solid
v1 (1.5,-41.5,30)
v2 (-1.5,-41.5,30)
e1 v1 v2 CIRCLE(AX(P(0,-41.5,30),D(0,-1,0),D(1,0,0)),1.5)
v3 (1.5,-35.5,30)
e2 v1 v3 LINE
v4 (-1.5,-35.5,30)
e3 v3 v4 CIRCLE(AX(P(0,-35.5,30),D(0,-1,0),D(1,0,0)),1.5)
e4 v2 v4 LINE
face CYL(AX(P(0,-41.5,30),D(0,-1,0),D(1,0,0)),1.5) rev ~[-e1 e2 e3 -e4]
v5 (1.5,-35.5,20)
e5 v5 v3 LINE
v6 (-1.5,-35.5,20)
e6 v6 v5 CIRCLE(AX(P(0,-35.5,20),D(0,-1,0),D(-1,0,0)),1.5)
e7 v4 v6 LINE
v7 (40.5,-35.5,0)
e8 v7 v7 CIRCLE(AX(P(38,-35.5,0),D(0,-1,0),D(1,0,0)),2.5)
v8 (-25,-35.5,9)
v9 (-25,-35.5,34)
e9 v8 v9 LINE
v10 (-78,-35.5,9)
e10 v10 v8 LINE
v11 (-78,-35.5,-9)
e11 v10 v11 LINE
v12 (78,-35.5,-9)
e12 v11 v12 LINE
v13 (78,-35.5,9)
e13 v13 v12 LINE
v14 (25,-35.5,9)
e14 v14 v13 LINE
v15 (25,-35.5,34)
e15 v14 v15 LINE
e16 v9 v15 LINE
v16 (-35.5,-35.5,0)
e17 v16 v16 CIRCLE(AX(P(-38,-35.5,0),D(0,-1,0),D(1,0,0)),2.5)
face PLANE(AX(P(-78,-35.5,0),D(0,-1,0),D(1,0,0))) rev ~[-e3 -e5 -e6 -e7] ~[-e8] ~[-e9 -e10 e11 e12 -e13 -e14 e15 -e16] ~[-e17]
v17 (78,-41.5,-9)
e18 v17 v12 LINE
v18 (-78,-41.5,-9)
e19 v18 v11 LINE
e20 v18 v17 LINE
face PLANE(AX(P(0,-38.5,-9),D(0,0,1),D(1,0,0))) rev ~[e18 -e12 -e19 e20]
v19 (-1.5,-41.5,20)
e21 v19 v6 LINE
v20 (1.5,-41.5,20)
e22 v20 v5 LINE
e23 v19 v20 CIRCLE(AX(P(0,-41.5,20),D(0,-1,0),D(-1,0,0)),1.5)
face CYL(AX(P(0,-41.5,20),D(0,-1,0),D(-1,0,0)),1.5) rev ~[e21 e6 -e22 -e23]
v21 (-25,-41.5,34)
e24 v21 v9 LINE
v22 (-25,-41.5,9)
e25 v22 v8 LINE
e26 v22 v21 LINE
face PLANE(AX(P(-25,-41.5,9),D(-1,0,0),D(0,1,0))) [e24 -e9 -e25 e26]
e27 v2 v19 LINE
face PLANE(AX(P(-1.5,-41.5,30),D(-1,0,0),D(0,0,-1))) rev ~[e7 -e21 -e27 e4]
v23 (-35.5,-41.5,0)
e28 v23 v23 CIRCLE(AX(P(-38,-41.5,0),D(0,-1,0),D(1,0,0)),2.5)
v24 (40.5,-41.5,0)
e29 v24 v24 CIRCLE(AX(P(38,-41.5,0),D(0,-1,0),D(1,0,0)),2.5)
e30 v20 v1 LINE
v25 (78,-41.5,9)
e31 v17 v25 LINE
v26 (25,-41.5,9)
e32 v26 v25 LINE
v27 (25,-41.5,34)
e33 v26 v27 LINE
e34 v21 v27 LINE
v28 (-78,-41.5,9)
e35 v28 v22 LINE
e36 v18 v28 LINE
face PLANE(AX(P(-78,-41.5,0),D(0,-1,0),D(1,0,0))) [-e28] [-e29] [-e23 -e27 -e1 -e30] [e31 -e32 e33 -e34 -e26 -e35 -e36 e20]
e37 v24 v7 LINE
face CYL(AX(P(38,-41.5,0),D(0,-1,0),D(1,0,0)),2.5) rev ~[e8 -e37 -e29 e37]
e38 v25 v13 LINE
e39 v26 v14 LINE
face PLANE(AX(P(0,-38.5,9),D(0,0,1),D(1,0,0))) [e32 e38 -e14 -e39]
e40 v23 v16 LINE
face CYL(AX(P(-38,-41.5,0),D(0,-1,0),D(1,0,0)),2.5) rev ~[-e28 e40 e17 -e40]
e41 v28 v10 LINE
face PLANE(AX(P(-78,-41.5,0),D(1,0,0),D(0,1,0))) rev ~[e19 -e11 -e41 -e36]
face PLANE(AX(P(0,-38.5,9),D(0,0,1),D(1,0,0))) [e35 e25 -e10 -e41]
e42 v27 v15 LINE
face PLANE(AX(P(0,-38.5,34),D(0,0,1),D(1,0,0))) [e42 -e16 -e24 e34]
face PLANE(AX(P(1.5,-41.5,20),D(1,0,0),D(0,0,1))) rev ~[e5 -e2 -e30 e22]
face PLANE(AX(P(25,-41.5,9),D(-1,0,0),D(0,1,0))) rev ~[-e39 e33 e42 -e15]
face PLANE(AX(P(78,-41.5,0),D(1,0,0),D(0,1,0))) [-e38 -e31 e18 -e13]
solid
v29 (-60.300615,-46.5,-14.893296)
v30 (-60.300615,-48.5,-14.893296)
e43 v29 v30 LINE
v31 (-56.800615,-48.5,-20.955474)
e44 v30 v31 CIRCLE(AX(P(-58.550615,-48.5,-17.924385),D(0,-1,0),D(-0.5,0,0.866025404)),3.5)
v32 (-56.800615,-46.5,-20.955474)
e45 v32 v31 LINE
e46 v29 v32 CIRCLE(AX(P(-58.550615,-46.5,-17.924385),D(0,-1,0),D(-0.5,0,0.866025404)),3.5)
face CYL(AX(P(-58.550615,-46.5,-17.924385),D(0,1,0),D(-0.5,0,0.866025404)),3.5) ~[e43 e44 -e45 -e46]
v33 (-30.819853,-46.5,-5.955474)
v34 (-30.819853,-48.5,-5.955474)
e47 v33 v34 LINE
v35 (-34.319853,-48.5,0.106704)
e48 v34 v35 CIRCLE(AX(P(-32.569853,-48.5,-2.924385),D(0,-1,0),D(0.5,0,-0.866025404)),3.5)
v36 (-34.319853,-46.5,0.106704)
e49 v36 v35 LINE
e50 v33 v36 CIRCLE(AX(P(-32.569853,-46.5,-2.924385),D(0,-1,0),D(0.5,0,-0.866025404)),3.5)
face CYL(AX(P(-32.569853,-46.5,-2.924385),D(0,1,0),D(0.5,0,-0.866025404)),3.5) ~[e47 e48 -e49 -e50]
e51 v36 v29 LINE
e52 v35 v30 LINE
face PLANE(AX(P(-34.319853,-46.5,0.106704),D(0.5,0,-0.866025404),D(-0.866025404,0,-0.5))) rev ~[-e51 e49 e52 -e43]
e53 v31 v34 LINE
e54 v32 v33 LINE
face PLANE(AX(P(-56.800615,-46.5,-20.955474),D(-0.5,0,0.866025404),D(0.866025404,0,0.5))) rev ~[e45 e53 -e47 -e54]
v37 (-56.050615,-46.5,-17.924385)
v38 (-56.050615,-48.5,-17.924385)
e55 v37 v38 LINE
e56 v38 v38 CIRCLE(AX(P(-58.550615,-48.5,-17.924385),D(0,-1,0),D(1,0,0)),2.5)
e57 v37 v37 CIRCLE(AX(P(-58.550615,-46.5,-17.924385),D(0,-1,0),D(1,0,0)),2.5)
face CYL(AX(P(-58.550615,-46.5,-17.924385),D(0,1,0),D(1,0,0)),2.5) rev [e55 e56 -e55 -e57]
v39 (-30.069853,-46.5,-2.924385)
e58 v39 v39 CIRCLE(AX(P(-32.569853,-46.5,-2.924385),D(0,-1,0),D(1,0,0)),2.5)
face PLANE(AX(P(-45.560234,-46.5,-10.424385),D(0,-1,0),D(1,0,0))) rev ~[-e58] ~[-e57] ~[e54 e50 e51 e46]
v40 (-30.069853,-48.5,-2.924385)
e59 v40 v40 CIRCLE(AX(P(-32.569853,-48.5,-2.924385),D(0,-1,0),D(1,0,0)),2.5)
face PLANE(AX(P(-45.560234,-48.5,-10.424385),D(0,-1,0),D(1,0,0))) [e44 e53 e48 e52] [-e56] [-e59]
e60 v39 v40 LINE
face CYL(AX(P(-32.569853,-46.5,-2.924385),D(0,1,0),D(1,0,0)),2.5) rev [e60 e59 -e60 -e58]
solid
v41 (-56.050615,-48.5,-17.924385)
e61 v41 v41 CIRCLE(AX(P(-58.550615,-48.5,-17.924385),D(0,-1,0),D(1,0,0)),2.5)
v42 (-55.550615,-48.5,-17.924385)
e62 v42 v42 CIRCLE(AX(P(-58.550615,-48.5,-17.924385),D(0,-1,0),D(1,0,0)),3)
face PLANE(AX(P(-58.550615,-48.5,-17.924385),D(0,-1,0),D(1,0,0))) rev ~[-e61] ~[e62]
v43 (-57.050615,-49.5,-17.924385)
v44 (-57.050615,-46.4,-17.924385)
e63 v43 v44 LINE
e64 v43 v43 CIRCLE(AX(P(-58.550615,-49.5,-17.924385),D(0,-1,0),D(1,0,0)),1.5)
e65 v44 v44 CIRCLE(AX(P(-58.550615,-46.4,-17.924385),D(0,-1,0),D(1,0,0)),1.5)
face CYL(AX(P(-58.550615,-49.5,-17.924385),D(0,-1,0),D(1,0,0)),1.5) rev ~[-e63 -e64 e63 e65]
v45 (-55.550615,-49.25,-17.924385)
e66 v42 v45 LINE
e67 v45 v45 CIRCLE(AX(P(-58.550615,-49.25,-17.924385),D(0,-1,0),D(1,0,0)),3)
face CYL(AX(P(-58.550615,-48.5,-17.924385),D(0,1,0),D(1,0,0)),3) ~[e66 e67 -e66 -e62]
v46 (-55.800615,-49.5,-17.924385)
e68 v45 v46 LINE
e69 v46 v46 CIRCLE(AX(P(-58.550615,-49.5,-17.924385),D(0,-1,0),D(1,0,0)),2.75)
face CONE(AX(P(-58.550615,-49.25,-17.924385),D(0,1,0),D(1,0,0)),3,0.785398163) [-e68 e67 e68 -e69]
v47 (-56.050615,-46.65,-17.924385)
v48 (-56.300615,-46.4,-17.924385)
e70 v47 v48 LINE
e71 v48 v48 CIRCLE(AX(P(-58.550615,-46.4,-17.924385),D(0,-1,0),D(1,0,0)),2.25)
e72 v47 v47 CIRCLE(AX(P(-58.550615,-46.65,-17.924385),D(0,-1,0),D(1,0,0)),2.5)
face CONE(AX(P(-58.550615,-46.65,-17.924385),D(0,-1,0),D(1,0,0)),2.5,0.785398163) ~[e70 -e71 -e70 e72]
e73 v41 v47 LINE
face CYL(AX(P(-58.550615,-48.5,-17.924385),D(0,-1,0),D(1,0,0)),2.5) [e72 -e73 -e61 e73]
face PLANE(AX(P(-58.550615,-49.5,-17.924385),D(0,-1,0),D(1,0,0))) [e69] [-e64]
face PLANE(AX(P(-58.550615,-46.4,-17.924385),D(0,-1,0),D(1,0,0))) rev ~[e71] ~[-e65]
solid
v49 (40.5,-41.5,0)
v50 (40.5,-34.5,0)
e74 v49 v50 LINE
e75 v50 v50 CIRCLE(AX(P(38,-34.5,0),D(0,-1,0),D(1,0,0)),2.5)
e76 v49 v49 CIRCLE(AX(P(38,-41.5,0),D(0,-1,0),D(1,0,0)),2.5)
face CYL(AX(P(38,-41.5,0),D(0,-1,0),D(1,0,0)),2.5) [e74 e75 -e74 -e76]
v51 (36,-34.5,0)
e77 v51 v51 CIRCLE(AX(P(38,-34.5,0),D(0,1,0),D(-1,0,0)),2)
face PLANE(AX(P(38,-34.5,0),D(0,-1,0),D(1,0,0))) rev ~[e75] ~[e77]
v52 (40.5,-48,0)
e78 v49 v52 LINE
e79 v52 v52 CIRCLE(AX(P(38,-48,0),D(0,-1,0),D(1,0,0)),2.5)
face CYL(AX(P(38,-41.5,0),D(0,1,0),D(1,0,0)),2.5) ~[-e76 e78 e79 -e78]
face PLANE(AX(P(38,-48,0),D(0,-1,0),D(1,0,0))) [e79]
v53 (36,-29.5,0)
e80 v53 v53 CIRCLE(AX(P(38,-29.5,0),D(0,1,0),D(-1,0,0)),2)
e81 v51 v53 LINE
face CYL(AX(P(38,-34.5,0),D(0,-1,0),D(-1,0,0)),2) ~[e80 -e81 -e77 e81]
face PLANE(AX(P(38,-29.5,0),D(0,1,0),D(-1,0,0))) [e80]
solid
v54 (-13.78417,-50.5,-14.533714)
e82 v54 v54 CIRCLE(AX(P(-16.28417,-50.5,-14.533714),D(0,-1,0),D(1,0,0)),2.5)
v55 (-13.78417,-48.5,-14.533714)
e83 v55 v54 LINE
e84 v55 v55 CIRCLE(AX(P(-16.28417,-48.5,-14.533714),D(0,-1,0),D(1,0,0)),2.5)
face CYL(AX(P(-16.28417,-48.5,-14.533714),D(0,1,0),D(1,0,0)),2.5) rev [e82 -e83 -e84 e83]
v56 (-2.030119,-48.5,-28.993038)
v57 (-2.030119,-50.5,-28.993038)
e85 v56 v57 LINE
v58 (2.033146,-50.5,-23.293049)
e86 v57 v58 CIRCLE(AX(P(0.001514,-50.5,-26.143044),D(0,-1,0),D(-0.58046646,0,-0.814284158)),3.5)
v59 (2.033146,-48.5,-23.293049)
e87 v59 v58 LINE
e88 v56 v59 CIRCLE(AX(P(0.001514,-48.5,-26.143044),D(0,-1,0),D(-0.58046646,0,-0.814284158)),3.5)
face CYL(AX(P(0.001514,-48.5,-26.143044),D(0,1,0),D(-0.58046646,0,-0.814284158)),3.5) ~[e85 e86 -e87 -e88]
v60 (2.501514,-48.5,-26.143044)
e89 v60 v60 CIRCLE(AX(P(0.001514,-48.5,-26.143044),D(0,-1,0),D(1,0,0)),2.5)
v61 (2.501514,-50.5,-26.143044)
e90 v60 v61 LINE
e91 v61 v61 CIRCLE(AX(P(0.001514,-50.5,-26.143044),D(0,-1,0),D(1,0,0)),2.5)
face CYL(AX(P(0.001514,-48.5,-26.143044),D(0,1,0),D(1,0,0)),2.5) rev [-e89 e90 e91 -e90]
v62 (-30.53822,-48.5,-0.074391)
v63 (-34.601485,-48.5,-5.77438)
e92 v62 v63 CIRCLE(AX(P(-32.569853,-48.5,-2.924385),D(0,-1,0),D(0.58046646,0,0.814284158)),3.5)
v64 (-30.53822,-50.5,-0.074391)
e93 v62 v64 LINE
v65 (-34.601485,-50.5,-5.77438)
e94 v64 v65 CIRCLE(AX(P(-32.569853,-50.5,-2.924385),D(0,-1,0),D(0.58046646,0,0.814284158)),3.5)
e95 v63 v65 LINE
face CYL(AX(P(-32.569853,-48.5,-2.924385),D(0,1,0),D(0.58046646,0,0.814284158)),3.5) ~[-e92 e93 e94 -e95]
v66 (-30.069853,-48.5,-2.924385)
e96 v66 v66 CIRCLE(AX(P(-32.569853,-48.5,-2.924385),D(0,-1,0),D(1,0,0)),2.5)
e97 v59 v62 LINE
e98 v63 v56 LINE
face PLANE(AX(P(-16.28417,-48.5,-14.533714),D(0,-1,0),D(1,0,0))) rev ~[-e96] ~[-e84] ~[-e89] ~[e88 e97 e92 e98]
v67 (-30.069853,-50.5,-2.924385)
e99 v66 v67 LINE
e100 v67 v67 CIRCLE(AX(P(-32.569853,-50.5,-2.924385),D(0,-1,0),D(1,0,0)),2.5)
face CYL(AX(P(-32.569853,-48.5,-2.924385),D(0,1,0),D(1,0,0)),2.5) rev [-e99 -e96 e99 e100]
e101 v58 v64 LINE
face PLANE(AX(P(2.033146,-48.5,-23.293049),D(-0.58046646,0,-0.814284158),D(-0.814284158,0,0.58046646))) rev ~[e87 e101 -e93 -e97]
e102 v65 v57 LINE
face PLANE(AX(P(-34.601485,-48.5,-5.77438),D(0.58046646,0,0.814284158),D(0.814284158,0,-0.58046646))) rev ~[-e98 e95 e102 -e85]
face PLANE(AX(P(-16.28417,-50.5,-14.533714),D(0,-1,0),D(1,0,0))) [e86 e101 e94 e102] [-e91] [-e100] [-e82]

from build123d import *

# Parameters (mm, degrees)
F0_W      = 156
F0_H      = 6
F1_DEPTH  = 9
F2_R      = 2.5
F3_DEPTH  = 6
F5_R      = 2.5
F6_DEPTH  = 7
F7_R      = 2
F8_DEPTH  = 5
F9_R      = 2.5
F10_DEPTH = 6.5
F11_W     = 50
F11_H     = 6
F12_DEPTH = 25
F14_DEPTH = 6
F15_R     = 2.5
F16_DEPTH = 2
F17_R     = 2.5
F18_DEPTH = 2
F20_R     = 2.5
F21_DEPTH = 2.1
F22_R     = 3
F23_DEPTH = 1
F24_R     = 1.5
F25_DEPTH = 3.1
F26_SIZE  = 0.25


with BuildPart() as f1:
    # F0 (on Top) → F1 (new body, symmetric)
    with BuildSketch(Plane.XY):
        with Locations((0, -38.5)):
            Rectangle(F0_W, F0_H)
    extrude(amount=F1_DEPTH, both=True)

    # F2 (on face) → F3 (cut, through all)
    with BuildSketch(Plane.XZ.offset(41.5)):
        with Locations((-38, 0)):
            Circle(F2_R)
        with Locations((38, 0)):
            Circle(F2_R)
    extrude(amount=-F3_DEPTH, mode=Mode.SUBTRACT)

    # F11 (on face) → F12 (join)
    with BuildSketch(Plane.XY.offset(9)):
        with Locations((0, -38.5)):
            Rectangle(F11_W, F11_H)
    extrude(amount=F12_DEPTH)

    # F13 (on face) → F14 (cut, through all)
    with BuildSketch(Plane.XZ.offset(41.5)):
        with BuildLine():
            ThreePointArc((1.5, 30), (0, 31.5), (-1.5, 30))
            Line((-1.5, 30), (-1.5, 20))
            ThreePointArc((-1.5, 20), (0, 18.5), (1.5, 20))
            Line((1.5, 20), (1.5, 30))
        make_face()
    extrude(amount=-F14_DEPTH, mode=Mode.SUBTRACT)


with BuildPart() as f6:
    # F5 (on face) → F6 (new body)
    with BuildSketch(Plane.XZ.offset(41.5)):
        with Locations((38, 0)):
            Circle(F5_R)
    extrude(amount=-F6_DEPTH)

    # F7 (on face) → F8 (join)
    with BuildSketch(Plane(origin=(0, -34.5, 0), x_dir=(-1, 0, 0), z_dir=(0, 1, 0))):
        with Locations((-38, 0)):
            Circle(F7_R)
    extrude(amount=F8_DEPTH)

    # F9 (on face) → F10 (join)
    with BuildSketch(Plane.XZ.offset(41.5)):
        with Locations((38, 0)):
            Circle(F9_R)
    extrude(amount=F10_DEPTH)


with BuildPart() as f16:
    # F15 (on offset) → F16 (new body)
    with BuildSketch(Plane.XZ.offset(46.5)):
        with BuildLine():
            ThreePointArc((-60.3006148636, -14.8932962321), (-61.5817037769, -19.6743851453), (-56.8006148636, -20.9554740586))
            Line((-56.8006148636, -20.9554740586), (-30.8198527501, -5.9554740586))
            ThreePointArc((-30.8198527501, -5.9554740586), (-29.5387638369, -1.1743851453), (-34.3198527501, 0.1067037679))
            Line((-34.3198527501, 0.1067037679), (-60.3006148636, -14.8932962321))
        make_face()
        with Locations((-58.5506148636, -17.9243851453)):
            Circle(F15_R, mode=Mode.SUBTRACT)
        with Locations((-32.5698527501, -2.9243851453)):
            Circle(F15_R, mode=Mode.SUBTRACT)
    extrude(amount=F16_DEPTH)


with BuildPart() as f18:
    # F17 (on face) → F18 (new body)
    with BuildSketch(Plane.XZ.offset(48.5)):
        with BuildLine():
            ThreePointArc((-30.5382201412, -0.074390594), (-35.4198473014, -0.8927525364), (-34.601485359, -5.7743796966))
            Line((-34.601485359, -5.7743796966), (-2.0301190581, -28.9930380836))
            ThreePointArc((-2.0301190581, -28.9930380836), (2.8515081021, -28.1746761412), (2.0331461597, -23.293048981))
            Line((2.0331461597, -23.293048981), (-30.5382201412, -0.074390594))
        make_face()
        with Locations((0.0015135508, -26.1430435323)):
            Circle(F17_R, mode=Mode.SUBTRACT)
        with Locations((-32.5698527501, -2.9243851453)):
            Circle(F17_R, mode=Mode.SUBTRACT)
        with Locations((-16.2841695997, -14.5337143388)):
            Circle(F17_R, mode=Mode.SUBTRACT)
    extrude(amount=F18_DEPTH)


with BuildPart() as f21:
    # F20 (on face) → F21 (new body)
    with BuildSketch(Plane.XZ.offset(48.5)):
        with Locations((-58.5506148636, -17.9243851453)):
            Circle(F20_R)
    extrude(amount=-F21_DEPTH)

    # F22 (on face) → F23 (join)
    with BuildSketch(Plane.XZ.offset(48.5)):
        with Locations((-58.5506148636, -17.9243851453)):
            Circle(F22_R)
    extrude(amount=F23_DEPTH)

    # F24 (on face) → F25 (cut, through all)
    with BuildSketch(Plane.XZ.offset(49.5)):
        with Locations((-58.5506148636, -17.9243851453)):
            Circle(F24_R)
    extrude(amount=-F25_DEPTH, mode=Mode.SUBTRACT)

    # F26
    f26_edges = [f21.edges().sort_by_distance(p)[0] for p in [
        (-61.550615, -49.5, -17.924385),
        (-61.050615, -46.4, -17.924385),
    ]]
    chamfer(f26_edges, length=F26_SIZE)


solid = Compound([f1.part, f6.part, f16.part, f18.part, f21.part])
